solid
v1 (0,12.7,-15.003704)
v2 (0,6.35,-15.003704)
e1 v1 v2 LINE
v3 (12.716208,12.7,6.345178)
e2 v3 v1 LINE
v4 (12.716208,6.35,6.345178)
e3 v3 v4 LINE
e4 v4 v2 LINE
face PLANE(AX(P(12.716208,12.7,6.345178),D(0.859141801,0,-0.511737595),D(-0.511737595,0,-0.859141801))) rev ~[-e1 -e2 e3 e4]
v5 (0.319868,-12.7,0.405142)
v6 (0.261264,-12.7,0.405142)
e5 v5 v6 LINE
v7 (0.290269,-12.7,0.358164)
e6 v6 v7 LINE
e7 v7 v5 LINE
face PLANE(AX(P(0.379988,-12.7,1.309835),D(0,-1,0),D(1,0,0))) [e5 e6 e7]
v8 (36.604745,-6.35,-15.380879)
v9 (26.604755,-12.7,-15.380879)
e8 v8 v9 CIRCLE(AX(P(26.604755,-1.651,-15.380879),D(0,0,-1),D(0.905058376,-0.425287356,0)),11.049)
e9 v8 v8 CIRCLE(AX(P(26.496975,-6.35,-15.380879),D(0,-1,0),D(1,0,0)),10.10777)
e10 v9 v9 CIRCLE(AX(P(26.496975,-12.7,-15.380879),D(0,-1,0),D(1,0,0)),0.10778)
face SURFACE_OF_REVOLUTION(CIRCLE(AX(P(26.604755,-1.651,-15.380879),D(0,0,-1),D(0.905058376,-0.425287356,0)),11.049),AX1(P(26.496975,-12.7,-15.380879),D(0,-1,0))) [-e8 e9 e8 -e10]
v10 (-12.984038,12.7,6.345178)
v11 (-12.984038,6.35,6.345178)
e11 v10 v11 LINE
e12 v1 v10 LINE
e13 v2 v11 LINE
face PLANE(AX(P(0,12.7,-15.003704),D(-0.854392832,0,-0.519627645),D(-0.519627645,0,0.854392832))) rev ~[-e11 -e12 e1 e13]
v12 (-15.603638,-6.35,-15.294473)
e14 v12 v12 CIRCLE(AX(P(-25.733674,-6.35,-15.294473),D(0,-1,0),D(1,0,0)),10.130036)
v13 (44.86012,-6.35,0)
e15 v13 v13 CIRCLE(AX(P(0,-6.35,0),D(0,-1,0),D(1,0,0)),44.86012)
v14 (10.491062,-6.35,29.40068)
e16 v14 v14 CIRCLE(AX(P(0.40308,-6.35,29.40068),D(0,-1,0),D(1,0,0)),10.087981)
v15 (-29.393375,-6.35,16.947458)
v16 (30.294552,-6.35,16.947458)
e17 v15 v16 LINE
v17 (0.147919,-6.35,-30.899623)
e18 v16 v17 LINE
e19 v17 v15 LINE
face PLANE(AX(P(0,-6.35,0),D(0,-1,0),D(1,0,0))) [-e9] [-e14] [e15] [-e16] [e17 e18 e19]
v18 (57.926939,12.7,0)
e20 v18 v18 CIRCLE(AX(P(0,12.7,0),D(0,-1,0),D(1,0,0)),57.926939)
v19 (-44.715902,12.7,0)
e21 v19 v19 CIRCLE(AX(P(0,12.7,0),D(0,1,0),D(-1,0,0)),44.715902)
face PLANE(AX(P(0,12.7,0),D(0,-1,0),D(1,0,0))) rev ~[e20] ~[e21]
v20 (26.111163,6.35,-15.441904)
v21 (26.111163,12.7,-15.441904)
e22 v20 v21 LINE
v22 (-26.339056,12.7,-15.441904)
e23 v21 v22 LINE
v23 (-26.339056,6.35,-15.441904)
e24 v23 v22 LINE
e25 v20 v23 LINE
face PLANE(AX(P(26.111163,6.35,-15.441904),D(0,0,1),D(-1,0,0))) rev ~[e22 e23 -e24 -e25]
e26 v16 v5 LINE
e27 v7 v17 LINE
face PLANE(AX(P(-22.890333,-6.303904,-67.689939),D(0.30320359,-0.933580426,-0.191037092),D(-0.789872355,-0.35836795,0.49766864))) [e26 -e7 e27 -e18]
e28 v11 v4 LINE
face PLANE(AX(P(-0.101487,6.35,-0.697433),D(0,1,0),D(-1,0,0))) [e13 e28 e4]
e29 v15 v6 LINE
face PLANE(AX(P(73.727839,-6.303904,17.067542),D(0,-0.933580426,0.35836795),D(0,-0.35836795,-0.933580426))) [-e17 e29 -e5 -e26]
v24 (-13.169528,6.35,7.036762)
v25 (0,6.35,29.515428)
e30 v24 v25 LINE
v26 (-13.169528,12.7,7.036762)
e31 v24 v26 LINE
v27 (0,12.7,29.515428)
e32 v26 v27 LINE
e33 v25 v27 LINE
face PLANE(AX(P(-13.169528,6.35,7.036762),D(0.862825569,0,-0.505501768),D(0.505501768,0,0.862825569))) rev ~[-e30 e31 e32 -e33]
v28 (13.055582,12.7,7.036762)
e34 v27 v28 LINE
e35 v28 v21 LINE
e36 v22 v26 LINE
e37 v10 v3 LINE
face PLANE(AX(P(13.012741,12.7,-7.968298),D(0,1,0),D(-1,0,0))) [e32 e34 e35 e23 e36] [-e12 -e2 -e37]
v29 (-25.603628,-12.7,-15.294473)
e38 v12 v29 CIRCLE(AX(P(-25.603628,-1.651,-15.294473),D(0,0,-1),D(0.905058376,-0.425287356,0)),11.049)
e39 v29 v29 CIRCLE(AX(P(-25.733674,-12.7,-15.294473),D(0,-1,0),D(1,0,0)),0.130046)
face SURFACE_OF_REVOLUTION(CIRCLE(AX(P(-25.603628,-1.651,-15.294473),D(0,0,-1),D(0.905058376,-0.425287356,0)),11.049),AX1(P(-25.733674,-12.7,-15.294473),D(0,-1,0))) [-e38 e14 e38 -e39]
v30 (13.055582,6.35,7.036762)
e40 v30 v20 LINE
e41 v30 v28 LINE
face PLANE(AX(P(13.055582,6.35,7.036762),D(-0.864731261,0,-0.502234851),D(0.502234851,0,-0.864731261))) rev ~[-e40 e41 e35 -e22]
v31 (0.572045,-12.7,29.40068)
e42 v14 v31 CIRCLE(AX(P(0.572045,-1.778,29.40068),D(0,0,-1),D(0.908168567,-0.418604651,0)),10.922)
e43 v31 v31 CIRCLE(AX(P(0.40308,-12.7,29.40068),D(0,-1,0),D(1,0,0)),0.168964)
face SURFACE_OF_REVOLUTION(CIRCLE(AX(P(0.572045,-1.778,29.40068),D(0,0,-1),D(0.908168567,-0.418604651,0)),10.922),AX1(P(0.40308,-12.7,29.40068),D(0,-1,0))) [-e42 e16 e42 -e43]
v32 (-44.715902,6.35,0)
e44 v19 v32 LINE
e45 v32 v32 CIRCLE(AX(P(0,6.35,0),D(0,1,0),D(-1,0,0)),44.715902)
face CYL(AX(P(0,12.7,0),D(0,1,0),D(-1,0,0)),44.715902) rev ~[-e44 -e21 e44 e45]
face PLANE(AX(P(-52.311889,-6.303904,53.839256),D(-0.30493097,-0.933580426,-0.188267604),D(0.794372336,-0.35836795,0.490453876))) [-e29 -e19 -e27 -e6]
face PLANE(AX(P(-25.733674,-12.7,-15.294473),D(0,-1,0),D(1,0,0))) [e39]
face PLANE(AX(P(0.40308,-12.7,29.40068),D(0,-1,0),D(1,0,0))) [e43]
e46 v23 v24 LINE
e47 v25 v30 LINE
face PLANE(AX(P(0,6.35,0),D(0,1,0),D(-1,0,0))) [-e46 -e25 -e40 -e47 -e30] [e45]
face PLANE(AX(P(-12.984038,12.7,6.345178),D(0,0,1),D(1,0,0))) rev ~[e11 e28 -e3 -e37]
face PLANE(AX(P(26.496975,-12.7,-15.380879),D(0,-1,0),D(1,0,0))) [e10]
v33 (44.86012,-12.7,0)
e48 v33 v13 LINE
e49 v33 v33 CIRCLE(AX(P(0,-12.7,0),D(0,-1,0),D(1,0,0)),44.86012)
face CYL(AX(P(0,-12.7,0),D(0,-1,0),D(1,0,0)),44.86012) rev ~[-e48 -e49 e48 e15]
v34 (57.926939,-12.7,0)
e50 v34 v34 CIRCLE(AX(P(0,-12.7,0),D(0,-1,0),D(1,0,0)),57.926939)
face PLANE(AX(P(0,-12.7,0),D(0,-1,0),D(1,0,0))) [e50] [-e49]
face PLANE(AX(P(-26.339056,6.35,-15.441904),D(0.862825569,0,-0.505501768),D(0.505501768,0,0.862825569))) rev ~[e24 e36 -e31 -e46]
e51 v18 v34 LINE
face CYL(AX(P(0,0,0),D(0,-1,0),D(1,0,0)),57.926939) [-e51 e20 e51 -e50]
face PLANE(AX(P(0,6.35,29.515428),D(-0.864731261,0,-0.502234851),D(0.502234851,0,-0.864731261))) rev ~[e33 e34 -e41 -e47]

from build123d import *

# Parameters (mm, degrees)
F0_R          = 57.9269385224
F0_R_2        = 45.238930614
F0_R_3        = 10.232456426
F0_R_4        = 9.9260337363
F0_R_5        = 10.3400506536
F1_DEPTH      = 12.7
F2_DEPTH      = 12.7
F3_R          = 44.8601198224
F4_DEPTH      = 6.35
F5_R          = 44.7159015694
F6_DEPTH      = 6.35
F8_DEPTH      = 6.35
F10_DEPTH     = 6.35
F11_R         = 10.0879812564
F11_R_2       = 10.1077702508
F11_R_3       = 10.130036121
F12_DEPTH     = 6.35
F16_T4_DEPTH  = 143.3938123808
F16_T11_DEPTH = 146.5521785494
F16_T18_DEPTH = 143.0711301992


# Not quite as in the source:
# - a fillet or chamfer that OpenCascade refuses, or shapes differently, is made with other operations: its cross-section is extruded or revolved along the edge and cut away or added


with BuildPart() as f1:
    # F0 (on Front) → F1 (new body)
    with BuildSketch(Plane.XZ):
        Circle(F0_R)
        Circle(F0_R_2, mode=Mode.SUBTRACT)
        Circle(F0_R_2)
        with Locations((-26.1295642704, -15.3669575229)):
            Circle(F0_R_3, mode=Mode.SUBTRACT)
        Polygon((-12.544834055, -34.5090515912), (0, -5.3877583705), (12.6424450427, -34.5090515912), align=None, mode=Mode.SUBTRACT)
        with Locations((26.1333119124, -15.1850637048)):
            Circle(F0_R_4, mode=Mode.SUBTRACT)
        Polygon((-36.0336452723, 4.8764180392), (-24.01153557, 26.9035063684), (-4.5260344632, 1.7700339667), align=None, mode=Mode.SUBTRACT)
        Polygon((36.1581519246, 4.842239432), (4.4649434276, 1.758374623), (24.0084677935, 26.875147596), align=None, mode=Mode.SUBTRACT)
        with Locations((0, 29.5979101211)):
            Circle(F0_R_5, mode=Mode.SUBTRACT)
        with Locations((0, 29.5979101211)):
            Circle(F0_R_5)
        Polygon((-4.5260344632, 1.7700339667), (-24.01153557, 26.9035063684), (-36.0336452723, 4.8764180392), align=None)
        with Locations((-26.1295642704, -15.3669575229)):
            Circle(F0_R_3)
        Polygon((12.6424450427, -34.5090515912), (0, -5.3877583705), (-12.544834055, -34.5090515912), align=None)
        with Locations((26.1333119124, -15.1850637048)):
            Circle(F0_R_4)
        Polygon((24.0084677935, 26.875147596), (4.4649434276, 1.758374623), (36.1581519246, 4.842239432), align=None)
    extrude(amount=F1_DEPTH)

    # F2 (add): a face of the model
    f2_faces = [f1.faces().sort_by_distance(p)[0] for p in [
        (0, 0, 0),
    ]]
    extrude(f2_faces, amount=F2_DEPTH)

    # F3 (on face) → F4 (cut)
    with BuildSketch(Plane.XZ.offset(12.7)):
        Circle(F3_R)
    extrude(amount=-F4_DEPTH, mode=Mode.SUBTRACT)

    # F5 (on face) → F6 (cut)
    with BuildSketch(Plane(origin=(0, 12.7, 0), x_dir=(-1, 0, 0), z_dir=(0, 1, 0))):
        Circle(F5_R)
    extrude(amount=-F6_DEPTH, mode=Mode.SUBTRACT)

    # F7 (on face) → F8 (join)
    with BuildSketch(Plane(origin=(0, 6.35, 0), x_dir=(-1, 0, 0), z_dir=(0, 1, 0))):
        Polygon((0.1139463857, -15.4419038445), (-13.0555815995, 7.0367623121), (-26.1111631989, -15.4419038445), align=None)
        Polygon((0.1139463857, -15.4419038445), (13.1695279852, 7.0367623121), (-13.0555815995, 7.0367623121), align=None)
        Polygon((13.1695279852, 7.0367623121), (0, 29.5154284686), (-13.0555815995, 7.0367623121), align=None)
        Polygon((26.3390559703, -15.4419038445), (13.1695279852, 7.0367623121), (0.1139463857, -15.4419038445), align=None)
    extrude(amount=F8_DEPTH)

    # F9 (on face) → F10 (cut)
    with BuildSketch(Plane(origin=(0, 12.7, 0), x_dir=(-1, 0, 0), z_dir=(0, 1, 0))):
        Polygon((12.9840383306, 6.3451784663), (-12.7162076533, 6.3451784663), (0, -15.0037035346), align=None)
    extrude(amount=-F10_DEPTH, mode=Mode.SUBTRACT)

    # F11 (on face) → F12 (join)
    with BuildSketch(Plane.XZ.offset(6.35)):
        with Locations((0.4030804266, 29.4006802142)):
            Circle(F11_R)
        with Locations((26.4969747514, -15.3808789328)):
            Circle(F11_R_2)
        with Locations((-25.7336739451, -15.2944726869)):
            Circle(F11_R_3)
        Polygon((0.1468855771, -31.126530841), (30.5121447891, 17.0675422996), (-29.6086445451, 17.0675422996), align=None)
    extrude(amount=F12_DEPTH)

    # F13: fillet of radius 10.922 on 1 edges, made by hand

    # F13_s1 → F13_t2 (revolve, cut)
    with BuildSketch(Plane.XY.offset(29.4006802142)):
        with BuildLine():
            ThreePointArc((10.491061683, -6.35), (6.4607923392, -10.9765180328), (0.5720445946, -12.7))
            Line((0.5720445946, -12.7), (10.491061683, -12.7))
            Line((10.491061683, -12.7), (10.491061683, -6.35))
        make_face()
    revolve(axis=Axis((0.4030804266, -12.7, 29.4006802142), (0, -1, 0)), mode=Mode.SUBTRACT)

    # F14: fillet of radius 11.049 on 1 edges, made by hand

    # F14_s1 → F14_t2 (revolve, cut)
    with BuildSketch(Plane.XY.offset(-15.2944726869)):
        with BuildLine():
            ThreePointArc((-15.6036378241, -6.35), (-19.6807421254, -10.9783697257), (-25.6036278241, -12.7))
            Line((-25.6036278241, -12.7), (-15.6036378241, -12.7))
            Line((-15.6036378241, -12.7), (-15.6036378241, -6.35))
        make_face()
    revolve(axis=Axis((-25.7336739451, -12.7, -15.2944726869), (0, -1, 0)), mode=Mode.SUBTRACT)

    # F15: fillet of radius 11.049 on 1 edges, made by hand

    # F15_s1 → F15_t2 (revolve, cut)
    with BuildSketch(Plane.XY.offset(-15.3808789328)):
        with BuildLine():
            ThreePointArc((36.6047450022, -6.35), (32.5276407009, -10.9783697257), (26.6047550022, -12.7))
            Line((26.6047550022, -12.7), (36.6047450022, -12.7))
            Line((36.6047450022, -12.7), (36.6047450022, -6.35))
        make_face()
    revolve(axis=Axis((26.4969747514, -12.7, -15.3808789328), (0, -1, 0)), mode=Mode.SUBTRACT)

    # F16: chamfer of 16.6624 x 6.3960960974 on 3 edges, made by hand


with BuildPart() as f16_tool2:
    # F16_s3 → F16_t4 (new body)
    with BuildSketch(Plane(origin=(-37.0340982639, 0, -58.7784885341), x_dir=(0, 1, 0), z_dir=(0.5330752718, 0, 0.8460678191))):
        Polygon((-6.3039039026, -16.7170590485), (-12.7, -0.0546590485), (-12.7, -16.7170590485), align=None)
    extrude(amount=F16_T4_DEPTH)

    split(bisect_by=Plane.XZ.offset(6.35), keep=Keep.TOP)

    split(bisect_by=Plane.XY.offset(17.0675422996), keep=Keep.BOTTOM)

    split(bisect_by=Plane(origin=(-13.8075741275, 0, -8.5249421991), x_dir=(0, 1, 0), z_dir=(0.8508879508, 0, 0.5253472139)), keep=Keep.TOP)


with BuildPart() as f1_1:
    add(f1.part)

    # F16_t1: cut F16_tool2
    add(f16_tool2.part, mode=Mode.SUBTRACT)


with BuildPart() as f16_tool9:
    # F16_s10 → F16_t11 (new body)
    with BuildSketch(Plane.YZ.offset(73.7278393967)):
        Polygon((-6.3039039026, 17.0675422996), (-12.7, 0.4051422996), (-12.7, 17.0675422996), align=None)
    extrude(amount=-F16_T11_DEPTH)

    split(bisect_by=Plane.XZ.offset(6.35), keep=Keep.TOP)

    split(bisect_by=Plane(origin=(14.1437656916, 0, -8.9114507961), x_dir=(0, 1, 0), z_dir=(-0.8460678191, 0, 0.5330752718)), keep=Keep.TOP)

    split(bisect_by=Plane(origin=(-13.8075741275, 0, -8.5249421991), x_dir=(0, 1, 0), z_dir=(0.8508879508, 0, 0.5253472139)), keep=Keep.TOP)


with BuildPart() as f1_2:
    add(f1_1.part)

    # F16_t8: cut F16_tool9
    add(f16_tool9.part, mode=Mode.SUBTRACT)


with BuildPart() as f16_tool16:
    # F16_s17 → F16_t18 (new body)
    with BuildSketch(Plane(origin=(-38.5043151766, 0, 62.3641983265), x_dir=(0, 1, 0), z_dir=(0.5253472139, 0, -0.8508879508))):
        Polygon((-6.3039039026, -16.2272530881), (-12.7, 0.4351469119), (-12.7, -16.2272530881), align=None)
    extrude(amount=F16_T18_DEPTH)

    split(bisect_by=Plane.XZ.offset(6.35), keep=Keep.TOP)

    split(bisect_by=Plane(origin=(14.1437656916, 0, -8.9114507961), x_dir=(0, 1, 0), z_dir=(-0.8460678191, 0, 0.5330752718)), keep=Keep.TOP)

    split(bisect_by=Plane.XY.offset(17.0675422996), keep=Keep.BOTTOM)


with BuildPart() as f1_3:
    add(f1_2.part)

    # F16_t15: cut F16_tool16
    add(f16_tool16.part, mode=Mode.SUBTRACT)


solid = f1_3.part
